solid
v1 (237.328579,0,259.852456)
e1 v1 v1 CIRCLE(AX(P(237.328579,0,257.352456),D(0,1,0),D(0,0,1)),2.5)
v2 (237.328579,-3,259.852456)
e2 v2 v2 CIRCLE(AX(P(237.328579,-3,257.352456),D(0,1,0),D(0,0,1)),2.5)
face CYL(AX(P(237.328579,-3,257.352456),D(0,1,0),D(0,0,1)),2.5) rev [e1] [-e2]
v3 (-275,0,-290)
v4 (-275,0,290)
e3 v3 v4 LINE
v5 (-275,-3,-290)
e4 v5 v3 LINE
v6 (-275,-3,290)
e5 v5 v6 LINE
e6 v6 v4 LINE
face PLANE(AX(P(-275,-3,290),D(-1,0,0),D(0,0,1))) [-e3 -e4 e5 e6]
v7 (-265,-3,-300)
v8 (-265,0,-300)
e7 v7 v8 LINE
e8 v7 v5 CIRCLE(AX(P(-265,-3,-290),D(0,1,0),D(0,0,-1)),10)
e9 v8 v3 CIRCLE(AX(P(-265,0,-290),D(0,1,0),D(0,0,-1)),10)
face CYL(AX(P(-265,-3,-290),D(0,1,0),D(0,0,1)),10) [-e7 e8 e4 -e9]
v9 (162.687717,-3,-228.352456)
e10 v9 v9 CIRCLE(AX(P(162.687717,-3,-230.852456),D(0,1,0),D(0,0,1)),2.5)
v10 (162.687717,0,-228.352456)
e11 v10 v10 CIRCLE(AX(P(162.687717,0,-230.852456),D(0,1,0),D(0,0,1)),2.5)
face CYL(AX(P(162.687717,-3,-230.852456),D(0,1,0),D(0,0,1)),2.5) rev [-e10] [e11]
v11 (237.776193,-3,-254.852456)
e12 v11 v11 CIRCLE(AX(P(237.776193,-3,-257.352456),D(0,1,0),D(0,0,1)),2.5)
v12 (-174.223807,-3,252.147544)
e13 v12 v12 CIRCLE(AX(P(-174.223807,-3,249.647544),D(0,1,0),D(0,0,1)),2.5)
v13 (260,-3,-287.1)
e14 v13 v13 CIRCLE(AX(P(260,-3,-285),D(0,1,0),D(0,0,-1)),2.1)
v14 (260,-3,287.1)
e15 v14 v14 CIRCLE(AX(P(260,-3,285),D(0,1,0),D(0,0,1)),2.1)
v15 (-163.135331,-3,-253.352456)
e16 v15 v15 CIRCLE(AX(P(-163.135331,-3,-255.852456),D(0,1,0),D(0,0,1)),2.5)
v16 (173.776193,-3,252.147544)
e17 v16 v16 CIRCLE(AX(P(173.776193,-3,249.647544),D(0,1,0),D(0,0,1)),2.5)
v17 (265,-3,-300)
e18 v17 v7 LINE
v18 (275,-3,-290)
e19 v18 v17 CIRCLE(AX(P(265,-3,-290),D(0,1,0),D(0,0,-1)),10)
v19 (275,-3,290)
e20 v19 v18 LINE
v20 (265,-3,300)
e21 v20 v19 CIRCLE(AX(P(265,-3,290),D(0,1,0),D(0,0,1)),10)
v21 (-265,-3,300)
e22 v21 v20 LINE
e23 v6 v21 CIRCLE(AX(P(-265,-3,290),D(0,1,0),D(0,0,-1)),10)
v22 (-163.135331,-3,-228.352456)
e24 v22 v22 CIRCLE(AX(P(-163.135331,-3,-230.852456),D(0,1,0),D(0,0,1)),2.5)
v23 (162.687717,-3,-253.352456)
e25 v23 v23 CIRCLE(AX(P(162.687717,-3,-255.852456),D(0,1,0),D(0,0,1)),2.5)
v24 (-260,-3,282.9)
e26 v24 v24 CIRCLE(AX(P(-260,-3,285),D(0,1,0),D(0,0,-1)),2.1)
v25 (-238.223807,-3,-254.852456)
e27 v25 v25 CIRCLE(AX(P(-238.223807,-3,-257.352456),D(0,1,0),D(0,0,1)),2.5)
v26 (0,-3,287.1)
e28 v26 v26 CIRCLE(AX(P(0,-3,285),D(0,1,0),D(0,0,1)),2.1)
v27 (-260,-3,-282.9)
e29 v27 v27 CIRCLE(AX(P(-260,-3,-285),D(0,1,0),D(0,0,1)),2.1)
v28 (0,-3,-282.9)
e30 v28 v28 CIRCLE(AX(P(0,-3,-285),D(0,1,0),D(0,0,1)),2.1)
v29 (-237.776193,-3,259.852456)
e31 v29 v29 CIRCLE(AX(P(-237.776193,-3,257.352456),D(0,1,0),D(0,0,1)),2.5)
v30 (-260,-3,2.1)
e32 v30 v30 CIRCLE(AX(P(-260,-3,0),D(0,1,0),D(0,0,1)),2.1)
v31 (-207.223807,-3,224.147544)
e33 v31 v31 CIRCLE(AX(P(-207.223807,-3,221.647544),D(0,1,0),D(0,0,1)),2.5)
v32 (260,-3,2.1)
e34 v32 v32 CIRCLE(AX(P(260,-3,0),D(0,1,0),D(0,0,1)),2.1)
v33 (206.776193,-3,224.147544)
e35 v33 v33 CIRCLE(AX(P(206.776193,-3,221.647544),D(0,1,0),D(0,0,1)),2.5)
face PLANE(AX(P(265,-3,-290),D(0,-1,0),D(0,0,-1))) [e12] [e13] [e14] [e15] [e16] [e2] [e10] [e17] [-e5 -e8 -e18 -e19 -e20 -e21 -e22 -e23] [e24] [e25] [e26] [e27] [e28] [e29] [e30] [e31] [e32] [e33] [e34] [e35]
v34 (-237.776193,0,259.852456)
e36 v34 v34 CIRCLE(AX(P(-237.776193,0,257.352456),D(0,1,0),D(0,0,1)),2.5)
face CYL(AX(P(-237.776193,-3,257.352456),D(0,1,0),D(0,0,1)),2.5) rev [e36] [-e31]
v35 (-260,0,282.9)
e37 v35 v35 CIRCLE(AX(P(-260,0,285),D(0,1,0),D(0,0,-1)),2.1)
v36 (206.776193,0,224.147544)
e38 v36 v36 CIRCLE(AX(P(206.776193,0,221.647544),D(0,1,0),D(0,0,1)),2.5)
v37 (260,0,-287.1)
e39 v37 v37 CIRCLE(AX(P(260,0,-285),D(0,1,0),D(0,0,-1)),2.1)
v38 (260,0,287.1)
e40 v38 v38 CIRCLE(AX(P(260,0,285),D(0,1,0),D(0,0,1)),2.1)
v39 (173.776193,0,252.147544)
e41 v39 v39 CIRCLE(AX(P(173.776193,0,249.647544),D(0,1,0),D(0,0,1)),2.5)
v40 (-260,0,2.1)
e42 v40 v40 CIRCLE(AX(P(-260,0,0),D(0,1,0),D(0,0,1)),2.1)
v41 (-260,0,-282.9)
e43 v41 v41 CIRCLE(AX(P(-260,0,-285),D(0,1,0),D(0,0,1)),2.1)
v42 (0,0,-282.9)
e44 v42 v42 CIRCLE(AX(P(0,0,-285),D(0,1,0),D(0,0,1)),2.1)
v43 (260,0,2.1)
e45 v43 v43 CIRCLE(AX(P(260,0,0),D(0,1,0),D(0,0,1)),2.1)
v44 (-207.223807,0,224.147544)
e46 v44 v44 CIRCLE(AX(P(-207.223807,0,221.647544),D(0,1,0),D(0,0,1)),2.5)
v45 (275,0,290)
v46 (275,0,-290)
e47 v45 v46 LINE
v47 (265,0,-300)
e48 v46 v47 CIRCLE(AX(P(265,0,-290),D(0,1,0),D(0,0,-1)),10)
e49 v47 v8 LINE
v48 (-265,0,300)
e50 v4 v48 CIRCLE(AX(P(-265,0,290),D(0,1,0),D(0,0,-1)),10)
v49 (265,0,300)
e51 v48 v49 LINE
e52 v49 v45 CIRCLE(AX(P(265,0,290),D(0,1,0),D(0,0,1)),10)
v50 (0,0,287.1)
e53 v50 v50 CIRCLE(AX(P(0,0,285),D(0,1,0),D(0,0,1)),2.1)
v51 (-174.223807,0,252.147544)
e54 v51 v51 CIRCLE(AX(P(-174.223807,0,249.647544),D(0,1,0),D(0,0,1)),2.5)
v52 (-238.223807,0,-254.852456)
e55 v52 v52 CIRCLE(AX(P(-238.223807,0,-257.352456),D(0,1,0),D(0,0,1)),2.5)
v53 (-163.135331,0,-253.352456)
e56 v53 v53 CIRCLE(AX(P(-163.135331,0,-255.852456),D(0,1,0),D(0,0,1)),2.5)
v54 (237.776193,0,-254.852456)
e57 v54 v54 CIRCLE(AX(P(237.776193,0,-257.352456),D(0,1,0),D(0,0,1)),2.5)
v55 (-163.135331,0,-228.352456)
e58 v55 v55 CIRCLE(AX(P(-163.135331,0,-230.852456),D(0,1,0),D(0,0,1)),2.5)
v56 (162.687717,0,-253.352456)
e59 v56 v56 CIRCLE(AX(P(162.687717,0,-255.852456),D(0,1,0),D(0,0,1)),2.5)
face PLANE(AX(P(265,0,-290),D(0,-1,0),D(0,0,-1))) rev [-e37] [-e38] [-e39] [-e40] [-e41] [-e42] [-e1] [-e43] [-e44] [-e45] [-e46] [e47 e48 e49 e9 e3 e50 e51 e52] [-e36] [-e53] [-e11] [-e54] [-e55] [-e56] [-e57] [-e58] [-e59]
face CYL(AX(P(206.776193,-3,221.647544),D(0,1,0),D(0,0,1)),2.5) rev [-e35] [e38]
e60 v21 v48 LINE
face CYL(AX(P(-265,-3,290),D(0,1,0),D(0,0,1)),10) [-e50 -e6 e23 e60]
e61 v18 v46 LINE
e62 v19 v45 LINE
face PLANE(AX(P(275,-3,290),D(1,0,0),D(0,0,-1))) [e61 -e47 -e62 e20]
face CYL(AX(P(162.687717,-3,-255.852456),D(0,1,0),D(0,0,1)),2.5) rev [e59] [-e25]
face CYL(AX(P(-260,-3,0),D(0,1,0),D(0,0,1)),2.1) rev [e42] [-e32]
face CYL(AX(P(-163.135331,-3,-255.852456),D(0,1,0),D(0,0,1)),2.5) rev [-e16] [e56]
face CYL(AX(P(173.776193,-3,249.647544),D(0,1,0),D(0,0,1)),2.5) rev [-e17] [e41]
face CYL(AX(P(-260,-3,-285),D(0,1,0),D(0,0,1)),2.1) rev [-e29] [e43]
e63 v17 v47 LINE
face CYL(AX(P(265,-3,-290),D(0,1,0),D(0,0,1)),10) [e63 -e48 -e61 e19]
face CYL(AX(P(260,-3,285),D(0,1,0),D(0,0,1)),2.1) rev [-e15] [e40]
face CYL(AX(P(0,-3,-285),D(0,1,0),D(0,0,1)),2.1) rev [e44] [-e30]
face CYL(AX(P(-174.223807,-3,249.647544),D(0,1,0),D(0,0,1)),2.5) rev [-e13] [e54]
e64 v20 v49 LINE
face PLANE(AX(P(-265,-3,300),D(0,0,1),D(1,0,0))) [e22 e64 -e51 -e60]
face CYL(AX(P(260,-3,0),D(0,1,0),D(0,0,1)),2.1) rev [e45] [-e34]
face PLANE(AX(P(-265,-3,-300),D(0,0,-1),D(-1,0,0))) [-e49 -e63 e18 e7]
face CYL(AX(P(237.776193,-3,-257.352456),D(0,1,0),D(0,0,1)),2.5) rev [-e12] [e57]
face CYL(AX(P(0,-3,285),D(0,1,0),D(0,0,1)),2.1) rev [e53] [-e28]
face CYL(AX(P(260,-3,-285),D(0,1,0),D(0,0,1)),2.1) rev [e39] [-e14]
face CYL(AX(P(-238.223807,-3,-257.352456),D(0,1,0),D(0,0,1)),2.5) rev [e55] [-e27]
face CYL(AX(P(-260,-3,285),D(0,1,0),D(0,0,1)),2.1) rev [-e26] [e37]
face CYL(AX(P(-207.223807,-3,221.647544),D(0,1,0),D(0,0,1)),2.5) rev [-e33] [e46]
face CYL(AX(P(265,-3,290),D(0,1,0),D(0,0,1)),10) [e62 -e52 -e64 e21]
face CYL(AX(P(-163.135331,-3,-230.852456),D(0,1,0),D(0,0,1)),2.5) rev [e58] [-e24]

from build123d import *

# Parameters (mm, degrees)
SKETCH_1_R             = 2.1
SKETCH_1_R_2           = 2.5
SM_BASE_FLANGE_1_DEPTH = 3


# Sheet-metal steps are written as plain solids
with BuildPart() as part:
    # Sketch 1 → 基体-法兰1 (new body)
    with BuildSketch(Plane(origin=(0, 0, 0), x_dir=(1, 0, 0), z_dir=(0, 1, 0))):
        with BuildLine():
            Line((-265, -300), (265, -300))
            ThreePointArc((265, -300), (272.071067812, -297.071067812), (275, -290))
            Line((275, -290), (275, 290))
            ThreePointArc((275, 290), (272.071067812, 297.071067812), (265, 300))
            Line((265, 300), (-265, 300))
            ThreePointArc((-265, 300), (-272.071067812, 297.071067812), (-275, 290))
            Line((-275, 290), (-275, -290))
            ThreePointArc((-275, -290), (-272.071067812, -297.071067812), (-265, -300))
        make_face()
        with Locations(Location((-260, 285, 0), (0, 0, 270))):
            Circle(SKETCH_1_R, mode=Mode.SUBTRACT)
        with Locations(Location((260, 285, 0), (0, 0, 90))):
            Circle(SKETCH_1_R, mode=Mode.SUBTRACT)
        with Locations(Location((260, -285, 0), (0, 0, 270))):
            Circle(SKETCH_1_R, mode=Mode.SUBTRACT)
        with Locations(Location((-260, -285, 0), (0, 0, 90))):
            Circle(SKETCH_1_R, mode=Mode.SUBTRACT)
        with Locations(Location((-260, 0, 0), (0, 0, 270))):
            Circle(SKETCH_1_R, mode=Mode.SUBTRACT)
        with Locations(Location((0, 285, 0), (0, 0, 270))):
            Circle(SKETCH_1_R, mode=Mode.SUBTRACT)
        with Locations(Location((260, 0, 0), (0, 0, 270))):
            Circle(SKETCH_1_R, mode=Mode.SUBTRACT)
        with Locations(Location((0, -285, 0), (0, 0, 270))):
            Circle(SKETCH_1_R, mode=Mode.SUBTRACT)
        with Locations(Location((206.776192938, -221.647543625, 0), (0, 0, 270))):
            Circle(SKETCH_1_R_2, mode=Mode.SUBTRACT)
        with Locations(Location((173.776192938, -249.647543625, 0), (0, 0, 270))):
            Circle(SKETCH_1_R_2, mode=Mode.SUBTRACT)
        with Locations(Location((-174.223807062, -249.647543625, 0), (0, 0, 270))):
            Circle(SKETCH_1_R_2, mode=Mode.SUBTRACT)
        with Locations(Location((-207.223807062, -221.647543625, 0), (0, 0, 270))):
            Circle(SKETCH_1_R_2, mode=Mode.SUBTRACT)
        with Locations(Location((-237.776192938, -257.352456375, 0), (0, 0, 270))):
            Circle(SKETCH_1_R_2, mode=Mode.SUBTRACT)
        with Locations(Location((237.328578815, -257.352456375, 0), (0, 0, 270))):
            Circle(SKETCH_1_R_2, mode=Mode.SUBTRACT)
        with Locations(Location((237.776192938, 257.352456375, 0), (0, 0, 270))):
            Circle(SKETCH_1_R_2, mode=Mode.SUBTRACT)
        with Locations(Location((162.687716862, 230.852456375, 0), (0, 0, 270))):
            Circle(SKETCH_1_R_2, mode=Mode.SUBTRACT)
        with Locations(Location((162.687716862, 255.852456375, 0), (0, 0, 270))):
            Circle(SKETCH_1_R_2, mode=Mode.SUBTRACT)
        with Locations(Location((-163.135330986, 255.852456375, 0), (0, 0, 270))):
            Circle(SKETCH_1_R_2, mode=Mode.SUBTRACT)
        with Locations(Location((-238.223807062, 257.352456375, 0), (0, 0, 270))):
            Circle(SKETCH_1_R_2, mode=Mode.SUBTRACT)
        with Locations(Location((-163.135330986, 230.852456375, 0), (0, 0, 270))):
            Circle(SKETCH_1_R_2, mode=Mode.SUBTRACT)
    extrude(amount=-SM_BASE_FLANGE_1_DEPTH)


solid = part.part
